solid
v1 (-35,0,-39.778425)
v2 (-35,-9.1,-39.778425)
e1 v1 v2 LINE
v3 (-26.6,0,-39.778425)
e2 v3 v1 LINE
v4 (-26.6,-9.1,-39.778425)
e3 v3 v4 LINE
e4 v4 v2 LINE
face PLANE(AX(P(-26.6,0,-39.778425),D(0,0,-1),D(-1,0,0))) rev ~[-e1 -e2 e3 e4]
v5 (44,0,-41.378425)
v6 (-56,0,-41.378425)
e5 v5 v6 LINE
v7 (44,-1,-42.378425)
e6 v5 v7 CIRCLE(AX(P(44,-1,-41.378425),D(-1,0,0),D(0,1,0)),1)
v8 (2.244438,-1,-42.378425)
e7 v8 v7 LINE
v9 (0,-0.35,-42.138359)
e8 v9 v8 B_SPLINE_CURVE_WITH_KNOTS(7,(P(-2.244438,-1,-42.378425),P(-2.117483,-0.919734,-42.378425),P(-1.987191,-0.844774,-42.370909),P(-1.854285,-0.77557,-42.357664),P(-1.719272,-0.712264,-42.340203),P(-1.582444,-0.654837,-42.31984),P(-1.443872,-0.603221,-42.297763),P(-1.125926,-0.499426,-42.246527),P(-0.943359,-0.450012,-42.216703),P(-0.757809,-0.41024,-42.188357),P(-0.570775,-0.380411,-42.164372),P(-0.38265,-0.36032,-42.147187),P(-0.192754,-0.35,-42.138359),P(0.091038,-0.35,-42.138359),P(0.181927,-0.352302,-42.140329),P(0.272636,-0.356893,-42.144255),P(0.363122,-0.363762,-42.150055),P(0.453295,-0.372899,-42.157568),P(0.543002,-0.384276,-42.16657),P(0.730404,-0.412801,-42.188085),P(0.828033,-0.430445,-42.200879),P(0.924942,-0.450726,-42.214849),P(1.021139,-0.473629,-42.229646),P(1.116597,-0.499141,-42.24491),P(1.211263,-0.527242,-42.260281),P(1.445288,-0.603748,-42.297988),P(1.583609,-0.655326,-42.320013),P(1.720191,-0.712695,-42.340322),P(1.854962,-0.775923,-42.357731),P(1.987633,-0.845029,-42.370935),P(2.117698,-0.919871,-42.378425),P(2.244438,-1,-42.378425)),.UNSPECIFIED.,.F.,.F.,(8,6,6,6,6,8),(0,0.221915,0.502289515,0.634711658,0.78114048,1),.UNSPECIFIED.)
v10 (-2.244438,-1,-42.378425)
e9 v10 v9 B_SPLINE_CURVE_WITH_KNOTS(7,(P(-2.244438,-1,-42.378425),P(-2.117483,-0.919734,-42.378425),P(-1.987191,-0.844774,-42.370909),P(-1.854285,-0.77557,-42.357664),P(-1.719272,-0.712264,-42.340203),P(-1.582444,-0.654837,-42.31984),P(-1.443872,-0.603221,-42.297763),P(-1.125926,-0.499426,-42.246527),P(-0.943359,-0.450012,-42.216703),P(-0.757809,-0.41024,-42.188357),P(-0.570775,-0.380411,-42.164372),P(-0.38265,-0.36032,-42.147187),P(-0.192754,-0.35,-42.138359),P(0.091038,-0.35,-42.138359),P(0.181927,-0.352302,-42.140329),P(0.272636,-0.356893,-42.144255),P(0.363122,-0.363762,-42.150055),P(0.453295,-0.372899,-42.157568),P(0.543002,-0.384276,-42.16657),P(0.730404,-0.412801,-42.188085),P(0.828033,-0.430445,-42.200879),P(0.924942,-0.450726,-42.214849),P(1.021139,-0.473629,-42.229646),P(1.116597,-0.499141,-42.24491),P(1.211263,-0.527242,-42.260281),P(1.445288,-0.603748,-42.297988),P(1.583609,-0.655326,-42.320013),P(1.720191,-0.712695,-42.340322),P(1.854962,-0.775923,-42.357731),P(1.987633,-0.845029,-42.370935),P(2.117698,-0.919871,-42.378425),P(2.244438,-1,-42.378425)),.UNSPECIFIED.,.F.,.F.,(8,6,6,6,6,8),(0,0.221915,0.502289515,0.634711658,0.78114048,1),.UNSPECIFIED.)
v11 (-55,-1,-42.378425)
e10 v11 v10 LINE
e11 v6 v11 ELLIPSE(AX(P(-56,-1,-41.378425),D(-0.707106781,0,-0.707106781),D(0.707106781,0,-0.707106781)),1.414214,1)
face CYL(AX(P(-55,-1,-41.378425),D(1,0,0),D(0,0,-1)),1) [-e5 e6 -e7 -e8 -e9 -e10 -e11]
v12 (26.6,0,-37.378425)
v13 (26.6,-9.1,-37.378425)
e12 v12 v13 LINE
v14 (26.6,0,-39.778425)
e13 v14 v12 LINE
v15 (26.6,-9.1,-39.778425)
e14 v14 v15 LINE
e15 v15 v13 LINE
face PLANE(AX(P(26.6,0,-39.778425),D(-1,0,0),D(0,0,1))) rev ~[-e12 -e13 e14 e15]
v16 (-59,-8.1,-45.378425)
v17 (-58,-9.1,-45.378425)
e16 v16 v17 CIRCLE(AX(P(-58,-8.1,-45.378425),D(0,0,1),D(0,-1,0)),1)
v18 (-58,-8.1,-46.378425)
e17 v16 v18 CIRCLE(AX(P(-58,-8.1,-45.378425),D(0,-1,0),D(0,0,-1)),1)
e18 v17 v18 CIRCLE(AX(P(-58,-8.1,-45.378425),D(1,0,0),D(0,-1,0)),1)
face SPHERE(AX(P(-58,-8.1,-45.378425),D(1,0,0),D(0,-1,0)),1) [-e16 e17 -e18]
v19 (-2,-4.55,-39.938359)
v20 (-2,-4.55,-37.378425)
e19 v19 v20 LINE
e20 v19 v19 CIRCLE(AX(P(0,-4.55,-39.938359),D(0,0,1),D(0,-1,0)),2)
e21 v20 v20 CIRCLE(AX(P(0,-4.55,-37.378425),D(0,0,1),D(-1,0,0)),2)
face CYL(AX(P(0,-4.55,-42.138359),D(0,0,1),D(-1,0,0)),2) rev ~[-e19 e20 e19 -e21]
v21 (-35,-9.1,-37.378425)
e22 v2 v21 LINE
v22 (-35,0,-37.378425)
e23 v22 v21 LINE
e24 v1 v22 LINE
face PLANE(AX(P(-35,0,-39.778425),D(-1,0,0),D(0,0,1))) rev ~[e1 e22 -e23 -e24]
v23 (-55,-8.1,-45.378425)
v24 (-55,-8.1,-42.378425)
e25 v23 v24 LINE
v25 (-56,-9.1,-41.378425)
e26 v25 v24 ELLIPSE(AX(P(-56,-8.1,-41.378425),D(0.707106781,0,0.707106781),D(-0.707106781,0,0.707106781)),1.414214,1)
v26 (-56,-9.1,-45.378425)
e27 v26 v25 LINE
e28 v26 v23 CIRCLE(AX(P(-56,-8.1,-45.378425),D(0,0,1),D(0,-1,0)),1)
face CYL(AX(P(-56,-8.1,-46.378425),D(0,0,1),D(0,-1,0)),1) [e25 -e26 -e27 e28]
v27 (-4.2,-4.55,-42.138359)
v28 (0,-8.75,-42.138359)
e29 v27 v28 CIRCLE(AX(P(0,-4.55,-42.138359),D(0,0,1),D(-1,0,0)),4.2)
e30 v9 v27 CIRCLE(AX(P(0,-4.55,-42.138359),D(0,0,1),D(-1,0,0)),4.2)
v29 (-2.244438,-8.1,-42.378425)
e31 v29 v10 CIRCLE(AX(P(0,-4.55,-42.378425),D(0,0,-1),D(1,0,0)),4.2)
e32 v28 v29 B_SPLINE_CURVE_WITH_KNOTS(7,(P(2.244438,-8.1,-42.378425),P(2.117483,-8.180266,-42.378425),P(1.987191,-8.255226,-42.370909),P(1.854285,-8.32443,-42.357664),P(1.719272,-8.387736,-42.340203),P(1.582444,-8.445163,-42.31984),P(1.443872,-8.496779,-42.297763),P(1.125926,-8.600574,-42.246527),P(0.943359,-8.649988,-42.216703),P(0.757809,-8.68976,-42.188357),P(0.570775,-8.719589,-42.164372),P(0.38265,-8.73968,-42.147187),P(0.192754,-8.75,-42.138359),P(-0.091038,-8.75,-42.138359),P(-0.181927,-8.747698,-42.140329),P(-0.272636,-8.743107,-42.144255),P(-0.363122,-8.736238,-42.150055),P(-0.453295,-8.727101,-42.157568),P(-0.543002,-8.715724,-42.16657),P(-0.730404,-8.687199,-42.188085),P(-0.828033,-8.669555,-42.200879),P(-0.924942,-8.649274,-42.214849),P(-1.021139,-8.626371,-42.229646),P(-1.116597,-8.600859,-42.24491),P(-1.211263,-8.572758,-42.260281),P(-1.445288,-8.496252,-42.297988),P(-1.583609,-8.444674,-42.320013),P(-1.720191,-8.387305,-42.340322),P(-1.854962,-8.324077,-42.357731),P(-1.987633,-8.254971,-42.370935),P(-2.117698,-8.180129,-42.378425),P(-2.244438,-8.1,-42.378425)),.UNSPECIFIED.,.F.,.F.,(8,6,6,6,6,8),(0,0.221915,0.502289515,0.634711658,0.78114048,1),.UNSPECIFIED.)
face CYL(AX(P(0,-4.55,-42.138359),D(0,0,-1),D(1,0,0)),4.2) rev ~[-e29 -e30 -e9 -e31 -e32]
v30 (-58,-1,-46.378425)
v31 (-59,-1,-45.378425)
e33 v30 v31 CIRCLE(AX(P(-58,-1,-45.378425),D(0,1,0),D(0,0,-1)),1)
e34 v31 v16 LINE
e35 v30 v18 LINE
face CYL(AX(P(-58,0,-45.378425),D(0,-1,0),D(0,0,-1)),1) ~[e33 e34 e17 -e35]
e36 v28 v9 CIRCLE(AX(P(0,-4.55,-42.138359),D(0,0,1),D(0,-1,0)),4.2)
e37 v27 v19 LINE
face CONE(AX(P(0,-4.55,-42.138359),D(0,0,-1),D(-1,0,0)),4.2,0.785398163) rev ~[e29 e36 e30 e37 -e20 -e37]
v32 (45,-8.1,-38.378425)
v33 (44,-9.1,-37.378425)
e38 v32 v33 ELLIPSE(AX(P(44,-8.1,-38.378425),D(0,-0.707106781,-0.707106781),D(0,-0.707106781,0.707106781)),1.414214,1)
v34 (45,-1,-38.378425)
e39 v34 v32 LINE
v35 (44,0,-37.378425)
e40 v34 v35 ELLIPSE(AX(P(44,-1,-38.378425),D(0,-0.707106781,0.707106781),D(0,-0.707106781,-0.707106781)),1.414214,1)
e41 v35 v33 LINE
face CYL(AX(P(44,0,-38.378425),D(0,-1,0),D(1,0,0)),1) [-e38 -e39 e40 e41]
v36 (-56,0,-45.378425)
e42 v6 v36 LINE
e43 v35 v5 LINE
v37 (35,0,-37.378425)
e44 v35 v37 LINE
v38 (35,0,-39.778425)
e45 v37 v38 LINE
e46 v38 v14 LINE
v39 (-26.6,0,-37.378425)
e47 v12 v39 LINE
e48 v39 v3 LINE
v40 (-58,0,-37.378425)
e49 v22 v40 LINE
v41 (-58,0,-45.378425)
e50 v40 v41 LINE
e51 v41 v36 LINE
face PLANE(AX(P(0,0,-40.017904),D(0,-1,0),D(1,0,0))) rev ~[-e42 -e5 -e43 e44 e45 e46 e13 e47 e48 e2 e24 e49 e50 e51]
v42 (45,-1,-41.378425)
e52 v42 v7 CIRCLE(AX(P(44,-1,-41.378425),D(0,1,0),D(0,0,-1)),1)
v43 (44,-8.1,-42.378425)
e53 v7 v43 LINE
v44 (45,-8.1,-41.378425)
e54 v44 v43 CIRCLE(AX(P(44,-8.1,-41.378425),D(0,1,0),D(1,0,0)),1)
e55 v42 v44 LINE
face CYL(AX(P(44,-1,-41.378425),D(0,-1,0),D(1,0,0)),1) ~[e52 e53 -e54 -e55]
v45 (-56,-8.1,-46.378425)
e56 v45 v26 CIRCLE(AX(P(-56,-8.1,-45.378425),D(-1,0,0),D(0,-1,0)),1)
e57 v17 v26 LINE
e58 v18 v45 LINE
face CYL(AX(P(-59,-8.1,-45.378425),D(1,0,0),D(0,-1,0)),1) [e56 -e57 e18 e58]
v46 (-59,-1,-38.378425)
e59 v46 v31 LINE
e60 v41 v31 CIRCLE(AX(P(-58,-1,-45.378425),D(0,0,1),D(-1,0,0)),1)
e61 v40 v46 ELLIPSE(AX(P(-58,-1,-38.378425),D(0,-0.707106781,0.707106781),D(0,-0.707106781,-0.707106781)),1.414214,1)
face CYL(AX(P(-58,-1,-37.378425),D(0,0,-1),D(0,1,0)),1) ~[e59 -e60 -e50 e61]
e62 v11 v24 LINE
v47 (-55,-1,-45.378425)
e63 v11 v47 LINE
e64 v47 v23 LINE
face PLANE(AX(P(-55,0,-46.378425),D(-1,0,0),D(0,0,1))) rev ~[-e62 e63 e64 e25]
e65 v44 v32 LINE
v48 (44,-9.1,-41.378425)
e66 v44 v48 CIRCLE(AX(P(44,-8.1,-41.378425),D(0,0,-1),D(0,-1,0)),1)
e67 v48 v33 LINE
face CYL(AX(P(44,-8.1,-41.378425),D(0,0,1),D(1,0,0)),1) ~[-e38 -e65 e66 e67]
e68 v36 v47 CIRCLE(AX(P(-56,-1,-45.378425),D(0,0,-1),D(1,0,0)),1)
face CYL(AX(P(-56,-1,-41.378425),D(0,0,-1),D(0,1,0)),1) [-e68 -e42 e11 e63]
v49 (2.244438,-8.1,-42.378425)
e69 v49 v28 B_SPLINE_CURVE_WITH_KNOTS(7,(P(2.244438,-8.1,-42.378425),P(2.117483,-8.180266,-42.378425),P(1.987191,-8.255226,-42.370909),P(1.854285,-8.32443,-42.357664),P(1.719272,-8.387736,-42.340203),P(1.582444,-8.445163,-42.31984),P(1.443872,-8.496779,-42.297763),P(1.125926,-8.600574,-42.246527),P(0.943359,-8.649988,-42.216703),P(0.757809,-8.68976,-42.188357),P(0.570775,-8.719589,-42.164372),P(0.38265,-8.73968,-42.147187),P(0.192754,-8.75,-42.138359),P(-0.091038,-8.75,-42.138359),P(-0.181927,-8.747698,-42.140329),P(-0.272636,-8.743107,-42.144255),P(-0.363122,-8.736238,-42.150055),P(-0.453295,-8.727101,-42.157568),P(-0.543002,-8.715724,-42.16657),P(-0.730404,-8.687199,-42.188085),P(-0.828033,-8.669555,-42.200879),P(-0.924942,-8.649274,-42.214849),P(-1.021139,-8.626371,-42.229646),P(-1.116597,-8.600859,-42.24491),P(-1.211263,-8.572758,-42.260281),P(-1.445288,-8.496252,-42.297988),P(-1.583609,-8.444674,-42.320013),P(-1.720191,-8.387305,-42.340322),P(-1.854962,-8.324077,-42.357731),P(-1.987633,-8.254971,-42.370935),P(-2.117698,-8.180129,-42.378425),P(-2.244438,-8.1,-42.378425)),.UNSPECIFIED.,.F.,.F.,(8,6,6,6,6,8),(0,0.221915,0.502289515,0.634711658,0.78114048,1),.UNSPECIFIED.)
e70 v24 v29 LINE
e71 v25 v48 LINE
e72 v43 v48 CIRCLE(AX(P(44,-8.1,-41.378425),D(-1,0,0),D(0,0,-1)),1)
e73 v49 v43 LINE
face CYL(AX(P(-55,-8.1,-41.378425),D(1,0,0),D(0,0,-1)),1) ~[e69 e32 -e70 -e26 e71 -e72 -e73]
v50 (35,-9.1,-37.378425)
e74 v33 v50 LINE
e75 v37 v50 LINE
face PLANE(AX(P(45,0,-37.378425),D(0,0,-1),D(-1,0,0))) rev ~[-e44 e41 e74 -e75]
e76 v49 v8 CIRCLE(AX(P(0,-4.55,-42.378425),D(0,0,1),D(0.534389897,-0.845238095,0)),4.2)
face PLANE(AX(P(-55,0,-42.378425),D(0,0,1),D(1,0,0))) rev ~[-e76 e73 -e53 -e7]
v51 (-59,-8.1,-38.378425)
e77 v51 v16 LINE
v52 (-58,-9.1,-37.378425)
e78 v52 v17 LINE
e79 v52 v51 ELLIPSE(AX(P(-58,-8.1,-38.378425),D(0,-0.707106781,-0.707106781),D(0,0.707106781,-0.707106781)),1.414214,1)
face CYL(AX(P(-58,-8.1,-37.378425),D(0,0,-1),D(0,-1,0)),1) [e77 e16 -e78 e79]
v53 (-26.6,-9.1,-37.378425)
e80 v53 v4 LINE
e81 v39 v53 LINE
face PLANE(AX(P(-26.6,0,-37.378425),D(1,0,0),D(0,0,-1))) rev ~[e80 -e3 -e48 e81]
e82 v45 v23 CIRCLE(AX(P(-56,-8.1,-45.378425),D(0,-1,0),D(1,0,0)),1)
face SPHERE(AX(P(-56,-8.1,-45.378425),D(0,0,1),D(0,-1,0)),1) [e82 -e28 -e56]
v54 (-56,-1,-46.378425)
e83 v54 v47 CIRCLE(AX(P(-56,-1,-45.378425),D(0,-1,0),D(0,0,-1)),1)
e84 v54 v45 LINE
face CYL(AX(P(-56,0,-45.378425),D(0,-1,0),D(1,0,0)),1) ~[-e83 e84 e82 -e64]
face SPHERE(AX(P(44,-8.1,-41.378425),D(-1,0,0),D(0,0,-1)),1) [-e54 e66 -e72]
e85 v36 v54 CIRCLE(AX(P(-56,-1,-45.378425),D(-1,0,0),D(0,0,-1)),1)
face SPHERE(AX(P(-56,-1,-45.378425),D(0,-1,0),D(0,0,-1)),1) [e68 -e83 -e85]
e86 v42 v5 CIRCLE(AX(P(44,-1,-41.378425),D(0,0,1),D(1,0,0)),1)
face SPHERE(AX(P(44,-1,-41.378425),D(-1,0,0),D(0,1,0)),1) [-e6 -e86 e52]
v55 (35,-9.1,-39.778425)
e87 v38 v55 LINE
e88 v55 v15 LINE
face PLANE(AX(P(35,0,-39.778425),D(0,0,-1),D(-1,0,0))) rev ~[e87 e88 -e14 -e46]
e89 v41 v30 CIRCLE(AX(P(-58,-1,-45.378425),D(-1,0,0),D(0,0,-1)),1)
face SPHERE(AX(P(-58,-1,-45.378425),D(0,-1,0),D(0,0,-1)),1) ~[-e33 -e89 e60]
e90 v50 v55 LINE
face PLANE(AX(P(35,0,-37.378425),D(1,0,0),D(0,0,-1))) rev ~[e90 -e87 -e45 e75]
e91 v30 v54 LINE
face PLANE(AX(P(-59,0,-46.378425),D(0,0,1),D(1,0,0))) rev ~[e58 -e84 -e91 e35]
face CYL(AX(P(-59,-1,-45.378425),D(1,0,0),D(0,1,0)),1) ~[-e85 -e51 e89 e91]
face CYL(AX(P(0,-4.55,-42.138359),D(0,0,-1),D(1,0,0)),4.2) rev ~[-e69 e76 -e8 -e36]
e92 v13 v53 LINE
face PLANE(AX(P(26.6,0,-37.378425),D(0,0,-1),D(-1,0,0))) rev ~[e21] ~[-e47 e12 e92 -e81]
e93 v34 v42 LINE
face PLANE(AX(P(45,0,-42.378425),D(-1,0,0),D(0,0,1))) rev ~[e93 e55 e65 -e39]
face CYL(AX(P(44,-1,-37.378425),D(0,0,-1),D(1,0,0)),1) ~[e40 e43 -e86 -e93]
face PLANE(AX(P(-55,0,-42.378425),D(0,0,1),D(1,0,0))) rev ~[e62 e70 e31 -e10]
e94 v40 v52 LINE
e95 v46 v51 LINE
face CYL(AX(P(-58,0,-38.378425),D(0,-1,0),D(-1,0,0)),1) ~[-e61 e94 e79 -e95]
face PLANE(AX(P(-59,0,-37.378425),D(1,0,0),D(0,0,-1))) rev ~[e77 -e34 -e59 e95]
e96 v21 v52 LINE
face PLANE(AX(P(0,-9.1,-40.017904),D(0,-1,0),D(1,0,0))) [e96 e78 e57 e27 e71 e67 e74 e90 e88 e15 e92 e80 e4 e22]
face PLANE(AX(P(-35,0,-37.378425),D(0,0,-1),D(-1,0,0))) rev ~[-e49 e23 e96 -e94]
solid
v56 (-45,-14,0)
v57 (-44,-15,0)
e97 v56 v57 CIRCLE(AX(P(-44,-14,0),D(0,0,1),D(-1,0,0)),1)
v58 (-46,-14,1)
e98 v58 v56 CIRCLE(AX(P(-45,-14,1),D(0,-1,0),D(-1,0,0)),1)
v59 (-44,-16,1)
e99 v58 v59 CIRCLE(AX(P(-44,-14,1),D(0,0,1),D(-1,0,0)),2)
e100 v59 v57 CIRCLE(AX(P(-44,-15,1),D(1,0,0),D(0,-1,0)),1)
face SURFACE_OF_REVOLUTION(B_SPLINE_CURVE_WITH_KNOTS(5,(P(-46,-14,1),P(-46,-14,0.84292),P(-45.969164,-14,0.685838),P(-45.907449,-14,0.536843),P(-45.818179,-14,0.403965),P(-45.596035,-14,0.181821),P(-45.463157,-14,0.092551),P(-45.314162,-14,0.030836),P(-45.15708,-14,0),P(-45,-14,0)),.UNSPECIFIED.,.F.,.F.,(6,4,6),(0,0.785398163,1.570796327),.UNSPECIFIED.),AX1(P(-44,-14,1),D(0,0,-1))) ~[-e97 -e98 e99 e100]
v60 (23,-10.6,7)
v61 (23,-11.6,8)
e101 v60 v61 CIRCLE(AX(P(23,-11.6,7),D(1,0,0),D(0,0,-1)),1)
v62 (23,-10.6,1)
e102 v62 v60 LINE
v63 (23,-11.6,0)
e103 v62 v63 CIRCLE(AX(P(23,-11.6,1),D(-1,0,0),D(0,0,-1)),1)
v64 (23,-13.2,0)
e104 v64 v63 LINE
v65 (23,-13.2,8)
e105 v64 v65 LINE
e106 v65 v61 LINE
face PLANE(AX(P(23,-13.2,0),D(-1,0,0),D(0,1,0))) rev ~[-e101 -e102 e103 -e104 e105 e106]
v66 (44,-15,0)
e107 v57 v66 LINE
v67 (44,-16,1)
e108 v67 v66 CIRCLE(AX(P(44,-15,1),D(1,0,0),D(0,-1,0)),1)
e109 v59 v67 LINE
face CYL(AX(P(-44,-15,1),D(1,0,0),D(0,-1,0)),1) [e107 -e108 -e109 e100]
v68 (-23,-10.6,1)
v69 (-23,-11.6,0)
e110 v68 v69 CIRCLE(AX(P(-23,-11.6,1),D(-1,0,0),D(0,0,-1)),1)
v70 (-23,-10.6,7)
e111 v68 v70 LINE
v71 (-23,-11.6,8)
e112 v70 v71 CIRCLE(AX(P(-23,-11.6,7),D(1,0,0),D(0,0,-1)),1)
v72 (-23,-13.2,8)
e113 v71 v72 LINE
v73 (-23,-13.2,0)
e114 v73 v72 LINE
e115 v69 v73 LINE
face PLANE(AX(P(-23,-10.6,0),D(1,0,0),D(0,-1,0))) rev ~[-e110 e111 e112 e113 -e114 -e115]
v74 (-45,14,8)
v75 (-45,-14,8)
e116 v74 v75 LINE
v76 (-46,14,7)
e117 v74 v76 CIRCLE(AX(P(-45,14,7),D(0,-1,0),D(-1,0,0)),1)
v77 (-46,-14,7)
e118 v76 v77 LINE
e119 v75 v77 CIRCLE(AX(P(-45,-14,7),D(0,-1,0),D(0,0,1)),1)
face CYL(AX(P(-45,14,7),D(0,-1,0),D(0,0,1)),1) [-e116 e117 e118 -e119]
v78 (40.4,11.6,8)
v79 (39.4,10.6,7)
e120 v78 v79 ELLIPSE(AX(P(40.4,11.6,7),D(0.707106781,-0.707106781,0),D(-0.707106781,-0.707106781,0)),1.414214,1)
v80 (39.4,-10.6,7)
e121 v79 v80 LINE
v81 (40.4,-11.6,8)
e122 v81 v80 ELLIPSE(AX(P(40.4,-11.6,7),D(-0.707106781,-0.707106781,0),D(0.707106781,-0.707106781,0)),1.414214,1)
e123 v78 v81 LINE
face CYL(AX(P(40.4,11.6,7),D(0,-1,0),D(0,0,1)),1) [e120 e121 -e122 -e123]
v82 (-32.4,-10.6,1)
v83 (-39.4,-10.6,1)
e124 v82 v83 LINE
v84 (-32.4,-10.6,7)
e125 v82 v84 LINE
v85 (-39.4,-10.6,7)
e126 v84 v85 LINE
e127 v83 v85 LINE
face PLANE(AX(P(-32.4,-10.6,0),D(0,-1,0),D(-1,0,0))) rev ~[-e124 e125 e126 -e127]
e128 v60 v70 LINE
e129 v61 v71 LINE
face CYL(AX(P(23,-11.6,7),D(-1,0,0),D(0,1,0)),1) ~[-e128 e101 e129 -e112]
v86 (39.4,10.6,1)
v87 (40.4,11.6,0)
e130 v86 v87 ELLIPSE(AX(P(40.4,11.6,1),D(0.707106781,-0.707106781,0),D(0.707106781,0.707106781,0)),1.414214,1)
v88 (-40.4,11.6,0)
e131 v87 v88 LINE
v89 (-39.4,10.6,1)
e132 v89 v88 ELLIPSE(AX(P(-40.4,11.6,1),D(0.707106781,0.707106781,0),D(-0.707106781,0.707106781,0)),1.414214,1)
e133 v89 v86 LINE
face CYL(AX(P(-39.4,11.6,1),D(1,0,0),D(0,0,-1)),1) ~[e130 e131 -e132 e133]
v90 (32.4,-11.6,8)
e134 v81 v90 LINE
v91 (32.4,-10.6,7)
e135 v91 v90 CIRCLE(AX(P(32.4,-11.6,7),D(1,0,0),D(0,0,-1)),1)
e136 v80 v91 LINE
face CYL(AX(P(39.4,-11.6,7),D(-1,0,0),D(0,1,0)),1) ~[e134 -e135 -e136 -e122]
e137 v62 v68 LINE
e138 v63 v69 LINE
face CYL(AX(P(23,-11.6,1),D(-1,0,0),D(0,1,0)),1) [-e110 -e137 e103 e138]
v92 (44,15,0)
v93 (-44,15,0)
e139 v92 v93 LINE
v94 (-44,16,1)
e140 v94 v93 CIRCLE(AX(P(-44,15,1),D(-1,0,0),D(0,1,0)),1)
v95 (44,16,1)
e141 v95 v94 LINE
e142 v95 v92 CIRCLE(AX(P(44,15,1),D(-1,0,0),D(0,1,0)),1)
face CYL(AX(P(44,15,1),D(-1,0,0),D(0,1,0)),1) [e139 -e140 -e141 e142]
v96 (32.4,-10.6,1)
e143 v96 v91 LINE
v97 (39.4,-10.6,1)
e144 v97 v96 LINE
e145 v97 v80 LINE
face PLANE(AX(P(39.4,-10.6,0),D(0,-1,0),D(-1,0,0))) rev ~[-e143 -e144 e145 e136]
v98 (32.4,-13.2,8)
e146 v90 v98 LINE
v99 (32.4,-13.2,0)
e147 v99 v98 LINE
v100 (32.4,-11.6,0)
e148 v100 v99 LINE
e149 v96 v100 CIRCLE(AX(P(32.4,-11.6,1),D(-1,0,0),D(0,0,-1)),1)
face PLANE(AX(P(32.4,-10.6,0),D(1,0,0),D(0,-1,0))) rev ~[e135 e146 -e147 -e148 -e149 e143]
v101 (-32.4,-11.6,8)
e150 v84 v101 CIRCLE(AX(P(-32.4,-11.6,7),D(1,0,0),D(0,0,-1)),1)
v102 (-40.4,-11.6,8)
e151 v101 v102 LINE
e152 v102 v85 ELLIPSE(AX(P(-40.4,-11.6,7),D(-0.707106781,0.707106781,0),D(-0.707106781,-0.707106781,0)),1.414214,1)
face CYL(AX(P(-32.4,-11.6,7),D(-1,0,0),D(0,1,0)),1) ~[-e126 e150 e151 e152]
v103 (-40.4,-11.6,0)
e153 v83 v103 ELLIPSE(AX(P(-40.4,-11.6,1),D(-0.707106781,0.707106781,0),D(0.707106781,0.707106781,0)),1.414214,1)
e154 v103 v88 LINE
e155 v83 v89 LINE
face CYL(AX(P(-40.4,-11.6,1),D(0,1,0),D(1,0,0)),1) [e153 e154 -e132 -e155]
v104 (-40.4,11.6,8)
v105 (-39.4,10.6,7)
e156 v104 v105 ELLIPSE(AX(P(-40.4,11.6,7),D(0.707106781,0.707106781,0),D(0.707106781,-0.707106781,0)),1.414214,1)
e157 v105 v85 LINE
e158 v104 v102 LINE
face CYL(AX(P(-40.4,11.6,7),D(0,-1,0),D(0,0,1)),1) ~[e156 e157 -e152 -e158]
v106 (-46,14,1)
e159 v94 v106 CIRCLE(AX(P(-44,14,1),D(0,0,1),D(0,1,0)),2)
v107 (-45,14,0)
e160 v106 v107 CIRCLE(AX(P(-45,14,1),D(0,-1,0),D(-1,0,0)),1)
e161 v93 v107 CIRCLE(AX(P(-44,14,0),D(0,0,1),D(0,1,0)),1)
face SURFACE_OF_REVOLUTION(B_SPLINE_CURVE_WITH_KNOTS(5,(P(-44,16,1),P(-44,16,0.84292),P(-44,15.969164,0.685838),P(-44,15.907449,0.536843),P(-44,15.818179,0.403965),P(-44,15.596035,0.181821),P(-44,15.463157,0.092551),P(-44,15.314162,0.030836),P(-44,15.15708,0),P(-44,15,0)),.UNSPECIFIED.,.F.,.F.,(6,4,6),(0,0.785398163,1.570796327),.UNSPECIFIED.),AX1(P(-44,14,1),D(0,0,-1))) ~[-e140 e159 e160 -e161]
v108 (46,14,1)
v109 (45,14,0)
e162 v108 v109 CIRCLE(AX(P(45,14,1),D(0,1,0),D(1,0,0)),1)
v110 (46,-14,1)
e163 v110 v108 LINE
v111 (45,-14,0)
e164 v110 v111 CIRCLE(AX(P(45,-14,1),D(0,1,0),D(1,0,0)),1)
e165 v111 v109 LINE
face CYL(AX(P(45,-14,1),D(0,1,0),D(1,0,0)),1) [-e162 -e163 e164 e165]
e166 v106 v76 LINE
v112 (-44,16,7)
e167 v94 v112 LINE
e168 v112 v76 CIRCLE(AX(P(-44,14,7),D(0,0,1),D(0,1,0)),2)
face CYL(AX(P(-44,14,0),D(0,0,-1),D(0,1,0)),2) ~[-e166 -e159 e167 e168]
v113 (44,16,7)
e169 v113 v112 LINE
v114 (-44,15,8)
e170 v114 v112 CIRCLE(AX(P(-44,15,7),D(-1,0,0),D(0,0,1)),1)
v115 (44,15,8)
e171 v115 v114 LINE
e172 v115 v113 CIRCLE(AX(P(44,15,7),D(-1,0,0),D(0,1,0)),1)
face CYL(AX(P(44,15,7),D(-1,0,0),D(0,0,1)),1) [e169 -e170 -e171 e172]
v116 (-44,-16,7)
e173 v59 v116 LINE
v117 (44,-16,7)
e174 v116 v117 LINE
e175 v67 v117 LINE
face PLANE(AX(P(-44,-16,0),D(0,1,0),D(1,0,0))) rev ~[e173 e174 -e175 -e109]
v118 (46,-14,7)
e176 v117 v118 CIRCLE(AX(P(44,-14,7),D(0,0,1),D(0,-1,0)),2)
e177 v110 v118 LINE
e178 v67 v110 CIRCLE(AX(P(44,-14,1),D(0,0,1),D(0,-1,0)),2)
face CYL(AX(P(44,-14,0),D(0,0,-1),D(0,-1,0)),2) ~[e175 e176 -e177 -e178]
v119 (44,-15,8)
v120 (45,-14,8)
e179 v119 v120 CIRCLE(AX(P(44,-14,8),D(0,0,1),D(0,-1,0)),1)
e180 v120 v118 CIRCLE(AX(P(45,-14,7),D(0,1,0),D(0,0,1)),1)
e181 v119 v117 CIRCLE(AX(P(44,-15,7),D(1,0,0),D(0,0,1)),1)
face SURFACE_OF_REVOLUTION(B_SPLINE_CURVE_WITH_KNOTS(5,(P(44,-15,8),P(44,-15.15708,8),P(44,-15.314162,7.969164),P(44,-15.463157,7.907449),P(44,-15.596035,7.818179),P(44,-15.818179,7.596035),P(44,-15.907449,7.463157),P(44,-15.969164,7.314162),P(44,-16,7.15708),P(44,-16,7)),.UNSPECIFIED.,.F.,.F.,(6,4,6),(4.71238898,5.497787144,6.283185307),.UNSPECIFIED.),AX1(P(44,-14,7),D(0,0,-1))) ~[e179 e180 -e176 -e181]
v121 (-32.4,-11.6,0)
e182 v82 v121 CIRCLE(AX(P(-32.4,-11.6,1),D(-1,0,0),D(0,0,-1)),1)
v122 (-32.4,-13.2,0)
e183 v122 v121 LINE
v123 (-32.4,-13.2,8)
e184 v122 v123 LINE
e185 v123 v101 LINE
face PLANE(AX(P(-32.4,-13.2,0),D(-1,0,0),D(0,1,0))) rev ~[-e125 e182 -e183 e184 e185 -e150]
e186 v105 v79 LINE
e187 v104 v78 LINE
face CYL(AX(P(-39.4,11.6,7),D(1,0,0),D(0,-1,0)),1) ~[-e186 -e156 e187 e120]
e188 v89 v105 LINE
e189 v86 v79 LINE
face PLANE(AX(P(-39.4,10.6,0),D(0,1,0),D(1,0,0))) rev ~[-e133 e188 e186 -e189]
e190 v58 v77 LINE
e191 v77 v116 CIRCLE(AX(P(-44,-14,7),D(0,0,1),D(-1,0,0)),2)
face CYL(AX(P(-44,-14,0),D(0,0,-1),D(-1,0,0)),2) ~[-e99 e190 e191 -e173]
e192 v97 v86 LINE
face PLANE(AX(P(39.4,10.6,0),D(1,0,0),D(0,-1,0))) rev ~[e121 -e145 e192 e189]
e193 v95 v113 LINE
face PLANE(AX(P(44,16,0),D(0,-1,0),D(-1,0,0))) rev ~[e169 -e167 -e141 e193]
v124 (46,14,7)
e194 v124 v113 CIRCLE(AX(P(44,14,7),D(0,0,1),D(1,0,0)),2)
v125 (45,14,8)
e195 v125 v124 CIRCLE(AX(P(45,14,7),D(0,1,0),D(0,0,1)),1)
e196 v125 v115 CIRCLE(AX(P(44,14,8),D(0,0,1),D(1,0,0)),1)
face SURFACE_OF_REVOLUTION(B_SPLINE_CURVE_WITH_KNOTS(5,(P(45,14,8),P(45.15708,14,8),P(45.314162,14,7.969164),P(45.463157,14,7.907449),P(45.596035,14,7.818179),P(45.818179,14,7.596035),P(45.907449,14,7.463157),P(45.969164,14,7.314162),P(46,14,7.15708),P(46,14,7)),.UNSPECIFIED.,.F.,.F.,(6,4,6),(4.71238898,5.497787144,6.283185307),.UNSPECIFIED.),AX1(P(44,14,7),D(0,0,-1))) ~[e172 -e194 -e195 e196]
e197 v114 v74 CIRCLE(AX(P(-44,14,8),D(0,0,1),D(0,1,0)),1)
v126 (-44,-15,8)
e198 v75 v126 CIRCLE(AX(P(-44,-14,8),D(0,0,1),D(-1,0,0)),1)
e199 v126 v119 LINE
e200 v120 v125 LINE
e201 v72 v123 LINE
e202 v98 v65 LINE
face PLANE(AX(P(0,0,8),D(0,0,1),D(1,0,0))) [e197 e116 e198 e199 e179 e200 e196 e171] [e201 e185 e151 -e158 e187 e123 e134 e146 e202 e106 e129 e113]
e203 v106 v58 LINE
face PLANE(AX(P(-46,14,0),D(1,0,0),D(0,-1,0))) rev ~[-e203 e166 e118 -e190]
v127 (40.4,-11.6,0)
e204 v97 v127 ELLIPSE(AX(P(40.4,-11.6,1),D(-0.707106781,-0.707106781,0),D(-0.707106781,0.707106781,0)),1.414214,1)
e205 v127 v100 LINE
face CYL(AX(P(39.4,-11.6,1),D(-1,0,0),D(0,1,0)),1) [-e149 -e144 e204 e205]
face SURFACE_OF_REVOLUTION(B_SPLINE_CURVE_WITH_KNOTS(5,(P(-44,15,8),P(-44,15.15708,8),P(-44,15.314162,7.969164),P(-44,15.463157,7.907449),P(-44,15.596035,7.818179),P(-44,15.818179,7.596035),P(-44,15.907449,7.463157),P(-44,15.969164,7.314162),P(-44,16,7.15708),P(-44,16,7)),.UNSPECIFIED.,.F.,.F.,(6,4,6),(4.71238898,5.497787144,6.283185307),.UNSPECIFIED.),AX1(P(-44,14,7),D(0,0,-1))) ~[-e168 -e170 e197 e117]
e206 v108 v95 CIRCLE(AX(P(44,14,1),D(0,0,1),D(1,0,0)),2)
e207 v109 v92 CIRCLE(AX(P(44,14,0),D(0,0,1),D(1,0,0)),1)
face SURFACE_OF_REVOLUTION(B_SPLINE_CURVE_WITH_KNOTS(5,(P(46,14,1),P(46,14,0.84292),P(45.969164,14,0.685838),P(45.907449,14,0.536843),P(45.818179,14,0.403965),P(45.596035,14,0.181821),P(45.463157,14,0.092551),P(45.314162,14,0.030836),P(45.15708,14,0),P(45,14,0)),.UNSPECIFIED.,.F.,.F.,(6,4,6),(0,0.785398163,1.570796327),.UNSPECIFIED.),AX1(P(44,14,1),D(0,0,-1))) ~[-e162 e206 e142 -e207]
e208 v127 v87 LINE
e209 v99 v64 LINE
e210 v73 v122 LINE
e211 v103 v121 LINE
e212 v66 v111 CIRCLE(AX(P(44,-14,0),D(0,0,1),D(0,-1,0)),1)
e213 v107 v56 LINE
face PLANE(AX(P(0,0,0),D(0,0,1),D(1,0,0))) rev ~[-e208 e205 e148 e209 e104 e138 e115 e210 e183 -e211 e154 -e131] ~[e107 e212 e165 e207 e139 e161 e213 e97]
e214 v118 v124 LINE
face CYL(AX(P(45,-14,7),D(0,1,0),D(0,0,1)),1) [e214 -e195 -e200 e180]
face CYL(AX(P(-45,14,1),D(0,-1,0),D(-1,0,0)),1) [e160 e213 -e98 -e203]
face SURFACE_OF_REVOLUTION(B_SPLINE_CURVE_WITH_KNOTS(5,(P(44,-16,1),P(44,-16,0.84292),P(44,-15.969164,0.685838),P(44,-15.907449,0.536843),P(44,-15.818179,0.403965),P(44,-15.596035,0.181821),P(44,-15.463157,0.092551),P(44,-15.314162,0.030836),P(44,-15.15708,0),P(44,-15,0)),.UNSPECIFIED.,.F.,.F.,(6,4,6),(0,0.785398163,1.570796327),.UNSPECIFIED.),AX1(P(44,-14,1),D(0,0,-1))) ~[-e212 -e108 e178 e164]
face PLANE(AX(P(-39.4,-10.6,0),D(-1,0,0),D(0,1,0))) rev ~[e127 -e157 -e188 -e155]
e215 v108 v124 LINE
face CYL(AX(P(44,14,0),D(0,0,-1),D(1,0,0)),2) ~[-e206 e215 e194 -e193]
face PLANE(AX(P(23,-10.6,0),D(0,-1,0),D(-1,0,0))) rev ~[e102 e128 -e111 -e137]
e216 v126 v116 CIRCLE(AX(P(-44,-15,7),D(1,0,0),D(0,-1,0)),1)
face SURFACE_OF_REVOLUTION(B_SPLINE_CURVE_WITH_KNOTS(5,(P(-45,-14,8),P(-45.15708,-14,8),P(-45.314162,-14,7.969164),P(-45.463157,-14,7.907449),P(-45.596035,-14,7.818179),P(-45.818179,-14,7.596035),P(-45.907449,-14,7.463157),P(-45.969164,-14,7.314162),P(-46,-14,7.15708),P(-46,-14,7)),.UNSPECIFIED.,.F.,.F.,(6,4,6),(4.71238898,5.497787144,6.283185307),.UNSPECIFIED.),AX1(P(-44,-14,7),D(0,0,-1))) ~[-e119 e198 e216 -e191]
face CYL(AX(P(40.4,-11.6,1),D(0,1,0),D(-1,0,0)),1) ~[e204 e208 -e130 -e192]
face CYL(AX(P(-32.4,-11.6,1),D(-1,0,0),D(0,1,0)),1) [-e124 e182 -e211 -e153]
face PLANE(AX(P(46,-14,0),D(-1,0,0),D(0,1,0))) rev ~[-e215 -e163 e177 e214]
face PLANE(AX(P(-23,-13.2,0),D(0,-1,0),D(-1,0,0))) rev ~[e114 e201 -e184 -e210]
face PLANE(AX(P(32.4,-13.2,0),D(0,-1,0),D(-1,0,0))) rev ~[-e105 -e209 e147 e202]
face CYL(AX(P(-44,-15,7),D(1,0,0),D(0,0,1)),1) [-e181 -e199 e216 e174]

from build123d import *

# Parameters (mm, degrees)
F1_DEPTH       = 8
F2_W           = 10
F2_H           = 5
F3_DEPTH       = 9.1
F4_R           = 1
F6_R           = 1
F7_D           = 4
F7_START       = 0.2400659
F7_CSINK_D     = 8.4
F7_CSINK_ANGLE = 90
F8_R           = 1
F9_R           = 1
F10_R          = 1
F11_R          = 1
F12_R          = 1


# Not quite as in the source:
# - a feature names something its author has since deleted; it is built from what else it names


with BuildPart() as f1:
    # F0 (on Top) → F1 (new body)
    with BuildSketch(Plane.XY):
        with BuildLine():
            Line((-44, -16), (44, -16))
            ThreePointArc((44, -16), (45.4142135624, -15.4142135624), (46, -14))
            Line((46, -14), (46, 14))
            ThreePointArc((46, 14), (45.4142135624, 15.4142135624), (44, 16))
            Line((44, 16), (-44, 16))
            ThreePointArc((-44, 16), (-45.4142135624, 15.4142135624), (-46, 14))
            Line((-46, 14), (-46, -14))
            ThreePointArc((-46, -14), (-45.4142135624, -15.4142135624), (-44, -16))
        make_face()
        Polygon((39.4, 10.6), (39.4, -10.6), (32.4, -10.6), (32.4, -13.2), (23, -13.2), (23, -10.6), (-23, -10.6), (-23, -13.2), (-32.4, -13.2), (-32.4, -10.6), (-39.4, -10.6), (-39.4, 10.6), align=None, mode=Mode.SUBTRACT)
    extrude(amount=F1_DEPTH)

    # F4
    f4_edges = [f1.edges().sort_by_distance(p)[0] for p in [
        (0, -10.6, 0),
        (35.9, -10.6, 0),
        (35.9, -10.6, 8),
        (0, -10.6, 8),
        (-35.9, -10.6, 8),
        (-35.9, -10.6, 0),
    ]]
    fillet(f4_edges, radius=F4_R)

    # F9
    f9_edges = [f1.edges().sort_by_distance(p)[0] for p in [
        (0, 10.6, 0),
        (0, 10.6, 8),
    ]]
    fillet(f9_edges, radius=F9_R)

    # F10
    f10_edges = [f1.edges().sort_by_distance(p)[0] for p in [
        (46, 0, 0),
        (0, 16, 0),
        (45.414214, 15.414214, 0),
        (-46, 0, 0),
        (-45.414214, 15.414214, 0),
        (46, 0, 8),
        (0, 16, 8),
        (45.414214, 15.414214, 8),
        (-46, 0, 8),
        (-45.414214, 15.414214, 8),
    ]]
    fillet(f10_edges, radius=F10_R)

    # F11
    f11_edges = [f1.edges().sort_by_distance(p)[0] for p in [
        (39.4, 0, 8),
        (-39.4, 0, 8),
        (-39.4, 0, 0),
        (39.4, 0, 0),
    ]]
    fillet(f11_edges, radius=F11_R)


with BuildPart() as f3:
    # F2 (on Front) → F3 (new body)
    with BuildSketch(Plane.XZ):
        Polygon((-45, -37.3784252584), (-45, -42.3784252584), (45, -42.3784252584), (45, -37.3784252584), (35, -37.3784252584), (35, -39.7784252584), (26.6, -39.7784252584), (26.6, -37.3784252584), (-26.6, -37.3784252584), (-26.6, -39.7784252584), (-35, -39.7784252584), (-35, -37.3784252584), align=None)
        with Locations((-50, -39.8784252584)):
            Rectangle(F2_W, F2_H)
        Polygon((-55, -46.3784252584), (-55, -42.3784252584), (-55, -37.3784252584), (-59, -37.3784252584), (-59, -46.3784252584), align=None)
    extrude(amount=F3_DEPTH)

    # F6
    f6_edges = [f3.edges().sort_by_distance(p)[0] for p in [
        (-5, -9.1, -42.378425),
        (-5, 0, -42.378425),
    ]]
    fillet(f6_edges, radius=F6_R)

    # F7 (through all)
    # its depths count from where the whole tool has entered the part; down to there all is cleared
    with Locations(Plane(origin=(0, 0, -42.3784252584), x_dir=(1, 0, 0), z_dir=(0, 0, -1)).offset(-F7_START)):
        with Locations((0, 4.55)):
            CounterSinkHole(F7_D / 2, F7_CSINK_D / 2, counter_sink_angle=F7_CSINK_ANGLE)

    # F8
    f8_edges = [f3.edges().sort_by_distance(p)[0] for p in [
        (45, -4.55, -42.378425),
        (45, -4.55, -37.378425),
    ]]
    fillet(f8_edges, radius=F8_R)

    # F12
    f12_edges = [f3.edges().sort_by_distance(p)[0] for p in [
        (-55, -9.1, -43.878425),
        (-57, -9.1, -46.378425),
        (-59, -9.1, -41.878425),
        (-55, -4.55, -46.378425),
        (-59, -4.55, -46.378425),
        (-57, 0, -46.378425),
        (-55, 0, -43.878425),
        (-59, 0, -41.878425),
        (-59, -4.55, -37.378425),
    ]]
    fillet(f12_edges, radius=F12_R)


solid = Compound([f1.part, f3.part])
